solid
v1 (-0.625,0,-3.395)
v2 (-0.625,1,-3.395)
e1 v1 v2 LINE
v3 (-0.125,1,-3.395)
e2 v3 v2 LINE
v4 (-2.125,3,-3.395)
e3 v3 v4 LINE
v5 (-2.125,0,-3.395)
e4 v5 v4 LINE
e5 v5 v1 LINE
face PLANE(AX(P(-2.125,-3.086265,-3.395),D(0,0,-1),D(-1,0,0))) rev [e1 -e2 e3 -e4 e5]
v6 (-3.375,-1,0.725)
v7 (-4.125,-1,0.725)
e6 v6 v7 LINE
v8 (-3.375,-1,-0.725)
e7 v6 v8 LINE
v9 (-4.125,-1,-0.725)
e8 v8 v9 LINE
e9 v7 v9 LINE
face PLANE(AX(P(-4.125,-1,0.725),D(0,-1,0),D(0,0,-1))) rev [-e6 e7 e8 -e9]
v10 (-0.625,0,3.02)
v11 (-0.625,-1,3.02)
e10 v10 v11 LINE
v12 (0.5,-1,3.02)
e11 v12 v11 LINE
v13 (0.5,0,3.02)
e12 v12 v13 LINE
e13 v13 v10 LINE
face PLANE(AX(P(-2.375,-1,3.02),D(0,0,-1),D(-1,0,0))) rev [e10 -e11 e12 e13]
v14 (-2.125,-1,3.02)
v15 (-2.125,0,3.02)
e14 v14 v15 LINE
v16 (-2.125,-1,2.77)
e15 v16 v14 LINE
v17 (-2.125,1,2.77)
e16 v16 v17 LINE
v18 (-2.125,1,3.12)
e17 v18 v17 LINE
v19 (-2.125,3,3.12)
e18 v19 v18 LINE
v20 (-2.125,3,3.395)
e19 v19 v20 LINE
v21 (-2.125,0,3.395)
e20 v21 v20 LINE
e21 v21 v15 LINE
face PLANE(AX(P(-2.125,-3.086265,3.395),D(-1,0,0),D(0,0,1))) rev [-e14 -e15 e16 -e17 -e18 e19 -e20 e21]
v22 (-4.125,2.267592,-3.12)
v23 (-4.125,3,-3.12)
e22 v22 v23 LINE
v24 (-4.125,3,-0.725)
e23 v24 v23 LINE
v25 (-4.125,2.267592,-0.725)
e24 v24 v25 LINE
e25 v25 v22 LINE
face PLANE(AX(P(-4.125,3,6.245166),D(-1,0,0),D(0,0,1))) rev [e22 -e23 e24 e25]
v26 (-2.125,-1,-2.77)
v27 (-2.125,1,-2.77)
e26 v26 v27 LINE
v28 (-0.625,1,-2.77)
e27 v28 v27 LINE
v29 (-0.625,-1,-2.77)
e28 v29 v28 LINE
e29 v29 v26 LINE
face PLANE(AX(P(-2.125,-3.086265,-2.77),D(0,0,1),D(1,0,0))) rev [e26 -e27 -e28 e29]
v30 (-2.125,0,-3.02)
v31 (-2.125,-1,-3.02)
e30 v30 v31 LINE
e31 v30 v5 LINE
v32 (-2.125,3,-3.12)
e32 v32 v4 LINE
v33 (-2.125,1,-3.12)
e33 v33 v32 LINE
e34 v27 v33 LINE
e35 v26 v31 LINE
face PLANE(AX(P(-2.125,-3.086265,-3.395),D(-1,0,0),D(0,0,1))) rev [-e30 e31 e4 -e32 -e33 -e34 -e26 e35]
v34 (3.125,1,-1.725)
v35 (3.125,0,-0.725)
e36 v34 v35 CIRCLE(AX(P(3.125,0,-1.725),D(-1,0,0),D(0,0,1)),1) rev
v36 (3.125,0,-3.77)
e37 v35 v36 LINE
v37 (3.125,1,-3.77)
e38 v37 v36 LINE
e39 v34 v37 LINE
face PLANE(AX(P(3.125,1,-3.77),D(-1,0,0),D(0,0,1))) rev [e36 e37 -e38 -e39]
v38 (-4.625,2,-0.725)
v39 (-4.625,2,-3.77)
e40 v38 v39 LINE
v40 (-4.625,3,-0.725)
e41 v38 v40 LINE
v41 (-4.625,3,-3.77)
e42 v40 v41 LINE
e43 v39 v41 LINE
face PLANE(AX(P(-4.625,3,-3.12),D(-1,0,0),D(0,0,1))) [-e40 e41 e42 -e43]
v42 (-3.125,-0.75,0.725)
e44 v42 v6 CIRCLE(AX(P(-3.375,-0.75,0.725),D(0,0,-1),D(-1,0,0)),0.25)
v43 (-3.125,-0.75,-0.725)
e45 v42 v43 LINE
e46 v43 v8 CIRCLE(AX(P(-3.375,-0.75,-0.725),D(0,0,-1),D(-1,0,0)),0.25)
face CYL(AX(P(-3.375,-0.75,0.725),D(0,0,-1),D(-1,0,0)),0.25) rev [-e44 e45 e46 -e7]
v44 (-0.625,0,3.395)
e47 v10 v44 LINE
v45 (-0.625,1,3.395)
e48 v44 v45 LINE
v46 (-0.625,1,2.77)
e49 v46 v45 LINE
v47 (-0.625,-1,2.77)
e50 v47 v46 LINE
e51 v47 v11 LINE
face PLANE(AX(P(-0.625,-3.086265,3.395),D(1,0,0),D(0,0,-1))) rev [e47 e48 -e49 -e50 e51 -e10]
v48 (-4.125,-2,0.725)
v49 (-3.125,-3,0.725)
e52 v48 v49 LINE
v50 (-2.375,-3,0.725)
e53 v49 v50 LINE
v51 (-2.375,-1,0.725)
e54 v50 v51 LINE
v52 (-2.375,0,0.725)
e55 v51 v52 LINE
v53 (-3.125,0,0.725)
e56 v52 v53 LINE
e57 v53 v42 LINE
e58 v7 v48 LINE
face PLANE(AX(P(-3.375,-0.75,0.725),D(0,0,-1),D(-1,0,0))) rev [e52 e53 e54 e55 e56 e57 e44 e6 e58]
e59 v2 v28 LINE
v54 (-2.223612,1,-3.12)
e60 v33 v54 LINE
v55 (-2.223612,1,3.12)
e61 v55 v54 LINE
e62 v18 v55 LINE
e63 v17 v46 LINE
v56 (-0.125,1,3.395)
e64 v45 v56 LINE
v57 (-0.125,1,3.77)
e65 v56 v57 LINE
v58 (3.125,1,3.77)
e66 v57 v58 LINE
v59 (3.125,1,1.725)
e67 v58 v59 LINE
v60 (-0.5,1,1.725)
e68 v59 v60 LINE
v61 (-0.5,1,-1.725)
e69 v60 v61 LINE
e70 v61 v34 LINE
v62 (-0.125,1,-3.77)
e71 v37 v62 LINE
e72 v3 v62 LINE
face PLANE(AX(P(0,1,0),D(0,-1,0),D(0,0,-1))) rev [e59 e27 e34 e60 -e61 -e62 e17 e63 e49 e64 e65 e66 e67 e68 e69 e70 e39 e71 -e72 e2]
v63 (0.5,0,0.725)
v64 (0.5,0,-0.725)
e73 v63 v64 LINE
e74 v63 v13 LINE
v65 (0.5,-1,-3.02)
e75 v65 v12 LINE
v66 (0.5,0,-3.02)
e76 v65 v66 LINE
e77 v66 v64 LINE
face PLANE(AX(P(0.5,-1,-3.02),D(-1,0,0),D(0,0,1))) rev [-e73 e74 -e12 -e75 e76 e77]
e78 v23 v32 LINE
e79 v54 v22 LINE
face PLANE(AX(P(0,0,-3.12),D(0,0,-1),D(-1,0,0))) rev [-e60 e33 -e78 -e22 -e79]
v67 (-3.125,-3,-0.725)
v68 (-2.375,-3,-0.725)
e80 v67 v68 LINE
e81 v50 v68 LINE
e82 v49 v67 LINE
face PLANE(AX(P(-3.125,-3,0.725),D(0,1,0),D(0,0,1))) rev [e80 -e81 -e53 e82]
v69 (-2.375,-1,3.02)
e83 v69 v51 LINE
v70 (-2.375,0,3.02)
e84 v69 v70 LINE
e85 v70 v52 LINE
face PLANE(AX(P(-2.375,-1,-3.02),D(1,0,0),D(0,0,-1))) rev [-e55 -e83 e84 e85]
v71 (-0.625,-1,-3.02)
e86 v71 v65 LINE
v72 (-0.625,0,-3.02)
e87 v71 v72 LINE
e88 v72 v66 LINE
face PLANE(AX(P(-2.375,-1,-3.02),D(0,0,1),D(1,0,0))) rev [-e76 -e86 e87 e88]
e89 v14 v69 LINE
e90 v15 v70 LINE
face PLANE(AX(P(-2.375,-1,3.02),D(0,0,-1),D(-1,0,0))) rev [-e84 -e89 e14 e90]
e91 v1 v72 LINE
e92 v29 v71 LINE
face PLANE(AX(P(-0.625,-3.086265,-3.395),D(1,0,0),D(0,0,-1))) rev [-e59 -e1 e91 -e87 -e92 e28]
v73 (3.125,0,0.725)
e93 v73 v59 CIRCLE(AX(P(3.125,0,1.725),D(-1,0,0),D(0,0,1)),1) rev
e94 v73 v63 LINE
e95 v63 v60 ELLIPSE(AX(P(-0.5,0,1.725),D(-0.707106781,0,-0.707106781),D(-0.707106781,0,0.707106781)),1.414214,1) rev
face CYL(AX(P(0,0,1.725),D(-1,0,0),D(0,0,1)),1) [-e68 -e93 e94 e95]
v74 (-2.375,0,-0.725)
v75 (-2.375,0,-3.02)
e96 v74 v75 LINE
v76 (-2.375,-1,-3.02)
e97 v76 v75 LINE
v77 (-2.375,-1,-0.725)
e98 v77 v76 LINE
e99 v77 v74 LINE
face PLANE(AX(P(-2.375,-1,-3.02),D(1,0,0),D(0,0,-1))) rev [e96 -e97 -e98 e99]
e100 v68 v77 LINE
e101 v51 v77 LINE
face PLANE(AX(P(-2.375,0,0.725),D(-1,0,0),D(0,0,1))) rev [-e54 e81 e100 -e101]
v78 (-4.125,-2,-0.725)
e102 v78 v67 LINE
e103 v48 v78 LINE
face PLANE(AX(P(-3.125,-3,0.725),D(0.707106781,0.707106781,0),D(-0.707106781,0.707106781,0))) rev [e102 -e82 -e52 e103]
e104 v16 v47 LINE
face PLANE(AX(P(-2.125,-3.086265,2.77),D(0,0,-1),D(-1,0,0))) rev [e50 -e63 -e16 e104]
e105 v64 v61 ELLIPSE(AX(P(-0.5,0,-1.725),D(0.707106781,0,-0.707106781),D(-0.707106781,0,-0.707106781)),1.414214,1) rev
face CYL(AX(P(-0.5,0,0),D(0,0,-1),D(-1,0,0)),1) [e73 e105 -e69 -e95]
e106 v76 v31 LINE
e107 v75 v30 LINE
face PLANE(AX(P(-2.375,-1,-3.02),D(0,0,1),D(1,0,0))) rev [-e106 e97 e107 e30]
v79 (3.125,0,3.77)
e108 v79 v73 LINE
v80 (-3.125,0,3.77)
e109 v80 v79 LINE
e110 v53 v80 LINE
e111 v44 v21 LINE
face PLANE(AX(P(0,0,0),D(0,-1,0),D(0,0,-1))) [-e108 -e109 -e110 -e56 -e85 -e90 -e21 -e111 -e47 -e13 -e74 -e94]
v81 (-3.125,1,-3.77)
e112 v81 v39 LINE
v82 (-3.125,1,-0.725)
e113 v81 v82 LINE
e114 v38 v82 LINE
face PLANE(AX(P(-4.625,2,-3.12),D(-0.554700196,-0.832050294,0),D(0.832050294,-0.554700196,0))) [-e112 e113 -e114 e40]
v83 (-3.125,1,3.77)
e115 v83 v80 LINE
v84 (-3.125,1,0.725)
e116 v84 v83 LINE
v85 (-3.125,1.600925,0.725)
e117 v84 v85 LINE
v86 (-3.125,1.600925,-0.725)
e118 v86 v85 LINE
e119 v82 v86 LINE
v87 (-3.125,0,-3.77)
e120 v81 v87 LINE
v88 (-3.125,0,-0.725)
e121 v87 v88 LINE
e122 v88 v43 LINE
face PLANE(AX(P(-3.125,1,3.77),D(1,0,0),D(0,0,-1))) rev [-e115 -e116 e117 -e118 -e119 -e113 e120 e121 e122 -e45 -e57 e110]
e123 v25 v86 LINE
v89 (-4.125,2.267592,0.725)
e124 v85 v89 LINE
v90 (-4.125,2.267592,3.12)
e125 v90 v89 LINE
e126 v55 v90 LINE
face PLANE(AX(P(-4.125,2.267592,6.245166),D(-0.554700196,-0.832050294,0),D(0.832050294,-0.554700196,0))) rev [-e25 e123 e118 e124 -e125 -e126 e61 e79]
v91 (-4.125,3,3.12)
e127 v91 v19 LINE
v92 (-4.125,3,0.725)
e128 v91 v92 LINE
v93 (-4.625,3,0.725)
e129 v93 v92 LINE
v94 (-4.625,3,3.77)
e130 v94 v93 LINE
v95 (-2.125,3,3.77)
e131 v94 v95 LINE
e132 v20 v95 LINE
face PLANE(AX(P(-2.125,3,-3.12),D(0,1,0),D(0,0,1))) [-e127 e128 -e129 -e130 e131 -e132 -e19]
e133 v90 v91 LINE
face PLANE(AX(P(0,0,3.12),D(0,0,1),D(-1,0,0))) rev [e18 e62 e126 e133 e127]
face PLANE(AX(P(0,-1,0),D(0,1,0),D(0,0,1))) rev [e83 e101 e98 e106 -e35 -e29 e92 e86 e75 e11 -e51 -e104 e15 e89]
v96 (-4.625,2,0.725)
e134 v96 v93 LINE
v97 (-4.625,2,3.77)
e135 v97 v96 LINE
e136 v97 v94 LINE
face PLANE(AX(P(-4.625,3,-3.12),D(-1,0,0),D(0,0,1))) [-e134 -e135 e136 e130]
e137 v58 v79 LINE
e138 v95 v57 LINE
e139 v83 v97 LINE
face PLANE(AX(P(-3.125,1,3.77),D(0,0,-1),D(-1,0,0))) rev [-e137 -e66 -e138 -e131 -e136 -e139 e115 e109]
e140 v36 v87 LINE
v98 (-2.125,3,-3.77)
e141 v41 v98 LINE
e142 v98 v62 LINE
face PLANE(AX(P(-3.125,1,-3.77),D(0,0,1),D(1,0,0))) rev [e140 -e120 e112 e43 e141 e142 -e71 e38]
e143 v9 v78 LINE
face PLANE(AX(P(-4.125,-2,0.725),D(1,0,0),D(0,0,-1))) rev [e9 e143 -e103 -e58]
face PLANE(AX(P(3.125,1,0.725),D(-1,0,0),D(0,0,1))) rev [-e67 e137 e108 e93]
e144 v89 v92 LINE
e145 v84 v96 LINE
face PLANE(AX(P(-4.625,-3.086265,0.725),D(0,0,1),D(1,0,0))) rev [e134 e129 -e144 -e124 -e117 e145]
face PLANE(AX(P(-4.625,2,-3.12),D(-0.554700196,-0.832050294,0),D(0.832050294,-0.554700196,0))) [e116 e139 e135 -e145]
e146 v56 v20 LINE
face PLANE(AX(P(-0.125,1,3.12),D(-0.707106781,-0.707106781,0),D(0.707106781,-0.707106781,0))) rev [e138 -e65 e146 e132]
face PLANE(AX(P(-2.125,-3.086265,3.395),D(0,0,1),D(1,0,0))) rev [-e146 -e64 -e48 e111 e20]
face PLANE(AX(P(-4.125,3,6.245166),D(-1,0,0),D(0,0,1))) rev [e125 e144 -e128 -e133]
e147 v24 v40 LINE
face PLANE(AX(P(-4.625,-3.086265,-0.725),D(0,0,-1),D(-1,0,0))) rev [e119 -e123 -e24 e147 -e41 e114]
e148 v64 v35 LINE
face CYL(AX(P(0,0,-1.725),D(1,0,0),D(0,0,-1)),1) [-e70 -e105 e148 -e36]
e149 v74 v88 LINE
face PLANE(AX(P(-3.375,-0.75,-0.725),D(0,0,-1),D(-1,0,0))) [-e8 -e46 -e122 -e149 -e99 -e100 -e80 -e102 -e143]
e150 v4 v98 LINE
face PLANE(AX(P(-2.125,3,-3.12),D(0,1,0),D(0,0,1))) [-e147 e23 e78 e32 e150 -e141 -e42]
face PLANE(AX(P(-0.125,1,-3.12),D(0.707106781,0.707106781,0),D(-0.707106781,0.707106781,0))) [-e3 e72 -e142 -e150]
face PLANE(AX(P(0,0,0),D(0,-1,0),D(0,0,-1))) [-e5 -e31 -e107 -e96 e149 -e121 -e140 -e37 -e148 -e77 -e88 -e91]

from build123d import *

# Parameters (mm, degrees)
BASE_DEPTH               = 1
SLOT_GUIDE_FILLET_1MM_R  = 1
SIDE_WALL_1_DEPTH        = 0.65
WALL_LINK_DEPTH          = 6.24
SKETCH4_W                = 2.875
SKETCH4_H                = 6.04
LOWER_FIT_DEPTH          = 1
CUT_THROUGH_REACH        = 9.184
SKETCH5_W                = 1.5
SKETCH5_H                = 1.45
SKETCH5_H_2              = 0.625
SKETCH6_W                = 0.5
SKETCH6_H                = 0.275
CUT_THROUGH_FINISH_DEPTH = 2
REAR_INSERT_DEPTH        = 0.725


with BuildPart() as part:
    # Sketch1 → Base (new body)
    with BuildSketch(Plane(origin=(0, 0, 0), x_dir=(1, 0, 0), z_dir=(0, 1, 0))):
        Polygon((3.125, 3.77), (3.125, 0.725), (0.5, 0.725), (0.5, -0.725), (3.125, -0.725), (3.125, -3.77), (-3.125, -3.77), (-3.125, 3.77), align=None)
    extrude(amount=BASE_DEPTH)

    # Slot Guide Fillet (1mm)
    slot_guide_fillet_1mm_edges = [part.edges().sort_by_distance(p)[0] for p in [
        (1.8125, 1, 0.725),
        (0.5, 1, 0),
        (1.8125, 1, -0.725),
    ]]
    fillet(slot_guide_fillet_1mm_edges, radius=SLOT_GUIDE_FILLET_1MM_R - 0.0001)  # a hair under: the kernel refuses the full size

    # Sketch2 → Side Wall 1 (add)
    with BuildSketch(Plane(origin=(0, 0, -3.77), x_dir=(-1, 0, 0), z_dir=(0, 0, -1))):
        Polygon((3.125, 1), (0.125, 1), (2.125, 3), (4.625, 3), (4.625, 2), align=None)
    side_wall_1 = extrude(amount=-SIDE_WALL_1_DEPTH)

    # Side Wall 2: Side Wall 1 across plane
    add(side_wall_1.mirror(Plane.XY))

    # Sketch3 → Wall Link (add)
    with BuildSketch(Plane.XY.offset(-3.12)):
        Polygon((-3.125, 1), (-4.625, 2), (-4.625, 3), (-4.125, 3), (-4.125, 2.267591879), (-2.223612181, 1), align=None)
    extrude(amount=WALL_LINK_DEPTH)

    # Sketch4 → Lower Fit (add)
    with BuildSketch(Plane.XZ):
        with Locations((-0.9375, 0)):
            Rectangle(SKETCH4_W, SKETCH4_H)
    extrude(amount=LOWER_FIT_DEPTH)

    # Cut Through: up to this face of the body (flat: up to its plane)
    cut_through_end = Plane(part.part.faces().sort_by_distance((-0.9375, -1, 0))[0])
    # Sketch5 → Cut Through (cut, up to the picked face)
    with BuildSketch(Plane(origin=(0, 3, 0), x_dir=(1, 0, 0), z_dir=(0, 1, 0)), mode=Mode.PRIVATE) as cut_through_sk1:
        with Locations((-3.875, 0)):
            Rectangle(SKETCH5_W, SKETCH5_H)
    cut_through_tool1 = split(extrude(cut_through_sk1.sketch, amount=-CUT_THROUGH_REACH, mode=Mode.PRIVATE), bisect_by=cut_through_end, keep=Keep.BOTH, mode=Mode.PRIVATE)
    # Sketch5 → Cut Through (cut, up to the picked face)
    with BuildSketch(Plane(origin=(0, 3, 0), x_dir=(1, 0, 0), z_dir=(0, 1, 0)), mode=Mode.PRIVATE) as cut_through_sk2:
        with Locations((-1.375, -3.0825)):
            Rectangle(SKETCH5_W, SKETCH5_H_2)
    cut_through_tool2 = split(extrude(cut_through_sk2.sketch, amount=-CUT_THROUGH_REACH, mode=Mode.PRIVATE), bisect_by=cut_through_end, keep=Keep.BOTH, mode=Mode.PRIVATE)
    # Sketch5 → Cut Through (cut, up to the picked face)
    with BuildSketch(Plane(origin=(0, 3, 0), x_dir=(1, 0, 0), z_dir=(0, 1, 0)), mode=Mode.PRIVATE) as cut_through_sk3:
        with Locations((-1.375, 3.0825)):
            Rectangle(SKETCH5_W, SKETCH5_H_2)
    cut_through_tool3 = split(extrude(cut_through_sk3.sketch, amount=-CUT_THROUGH_REACH, mode=Mode.PRIVATE), bisect_by=cut_through_end, keep=Keep.BOTH, mode=Mode.PRIVATE)
    add(cut_through_tool1.solids().sort_by(Axis((-3.875, 3, 0), (0, -1, 0)))[0], mode=Mode.SUBTRACT)
    add(cut_through_tool2.solids().sort_by(Axis((-1.375, 3, 3.0825), (0, -1, 0)))[0], mode=Mode.SUBTRACT)
    add(cut_through_tool3.solids().sort_by(Axis((-1.375, 3, -3.0825), (0, -1, 0)))[0], mode=Mode.SUBTRACT)

    # Sketch6 → Cut Through Finish (cut)
    with BuildSketch(Plane(origin=(0, 1, 0), x_dir=(1, 0, 0), z_dir=(0, 1, 0))):
        with Locations((-0.375, 3.2575)):
            Rectangle(SKETCH6_W, SKETCH6_H)
        with Locations((-0.375, -3.2575)):
            Rectangle(SKETCH6_W, SKETCH6_H)
    extrude(amount=CUT_THROUGH_FINISH_DEPTH, mode=Mode.SUBTRACT)

    # Sketch7 → Rear Insert (add, symmetric)
    with BuildSketch(Plane.XY):
        with BuildLine():
            Line((-3.125, -3), (-2.375, -3))
            Line((-2.375, -3), (-2.375, -1))
            Line((-2.375, -1), (-2.375, 0))
            Line((-2.375, 0), (-3.125, 0))
            Line((-3.125, 0), (-3.125, -0.75))
            ThreePointArc((-3.125, -0.75), (-3.198223305, -0.926776695), (-3.375, -1))
            Line((-3.375, -1), (-4.125, -1))
            Line((-4.125, -1), (-4.125, -2))
            Line((-4.125, -2), (-3.125, -3))
        make_face()
    extrude(amount=REAR_INSERT_DEPTH, both=True)


solid = part.part
